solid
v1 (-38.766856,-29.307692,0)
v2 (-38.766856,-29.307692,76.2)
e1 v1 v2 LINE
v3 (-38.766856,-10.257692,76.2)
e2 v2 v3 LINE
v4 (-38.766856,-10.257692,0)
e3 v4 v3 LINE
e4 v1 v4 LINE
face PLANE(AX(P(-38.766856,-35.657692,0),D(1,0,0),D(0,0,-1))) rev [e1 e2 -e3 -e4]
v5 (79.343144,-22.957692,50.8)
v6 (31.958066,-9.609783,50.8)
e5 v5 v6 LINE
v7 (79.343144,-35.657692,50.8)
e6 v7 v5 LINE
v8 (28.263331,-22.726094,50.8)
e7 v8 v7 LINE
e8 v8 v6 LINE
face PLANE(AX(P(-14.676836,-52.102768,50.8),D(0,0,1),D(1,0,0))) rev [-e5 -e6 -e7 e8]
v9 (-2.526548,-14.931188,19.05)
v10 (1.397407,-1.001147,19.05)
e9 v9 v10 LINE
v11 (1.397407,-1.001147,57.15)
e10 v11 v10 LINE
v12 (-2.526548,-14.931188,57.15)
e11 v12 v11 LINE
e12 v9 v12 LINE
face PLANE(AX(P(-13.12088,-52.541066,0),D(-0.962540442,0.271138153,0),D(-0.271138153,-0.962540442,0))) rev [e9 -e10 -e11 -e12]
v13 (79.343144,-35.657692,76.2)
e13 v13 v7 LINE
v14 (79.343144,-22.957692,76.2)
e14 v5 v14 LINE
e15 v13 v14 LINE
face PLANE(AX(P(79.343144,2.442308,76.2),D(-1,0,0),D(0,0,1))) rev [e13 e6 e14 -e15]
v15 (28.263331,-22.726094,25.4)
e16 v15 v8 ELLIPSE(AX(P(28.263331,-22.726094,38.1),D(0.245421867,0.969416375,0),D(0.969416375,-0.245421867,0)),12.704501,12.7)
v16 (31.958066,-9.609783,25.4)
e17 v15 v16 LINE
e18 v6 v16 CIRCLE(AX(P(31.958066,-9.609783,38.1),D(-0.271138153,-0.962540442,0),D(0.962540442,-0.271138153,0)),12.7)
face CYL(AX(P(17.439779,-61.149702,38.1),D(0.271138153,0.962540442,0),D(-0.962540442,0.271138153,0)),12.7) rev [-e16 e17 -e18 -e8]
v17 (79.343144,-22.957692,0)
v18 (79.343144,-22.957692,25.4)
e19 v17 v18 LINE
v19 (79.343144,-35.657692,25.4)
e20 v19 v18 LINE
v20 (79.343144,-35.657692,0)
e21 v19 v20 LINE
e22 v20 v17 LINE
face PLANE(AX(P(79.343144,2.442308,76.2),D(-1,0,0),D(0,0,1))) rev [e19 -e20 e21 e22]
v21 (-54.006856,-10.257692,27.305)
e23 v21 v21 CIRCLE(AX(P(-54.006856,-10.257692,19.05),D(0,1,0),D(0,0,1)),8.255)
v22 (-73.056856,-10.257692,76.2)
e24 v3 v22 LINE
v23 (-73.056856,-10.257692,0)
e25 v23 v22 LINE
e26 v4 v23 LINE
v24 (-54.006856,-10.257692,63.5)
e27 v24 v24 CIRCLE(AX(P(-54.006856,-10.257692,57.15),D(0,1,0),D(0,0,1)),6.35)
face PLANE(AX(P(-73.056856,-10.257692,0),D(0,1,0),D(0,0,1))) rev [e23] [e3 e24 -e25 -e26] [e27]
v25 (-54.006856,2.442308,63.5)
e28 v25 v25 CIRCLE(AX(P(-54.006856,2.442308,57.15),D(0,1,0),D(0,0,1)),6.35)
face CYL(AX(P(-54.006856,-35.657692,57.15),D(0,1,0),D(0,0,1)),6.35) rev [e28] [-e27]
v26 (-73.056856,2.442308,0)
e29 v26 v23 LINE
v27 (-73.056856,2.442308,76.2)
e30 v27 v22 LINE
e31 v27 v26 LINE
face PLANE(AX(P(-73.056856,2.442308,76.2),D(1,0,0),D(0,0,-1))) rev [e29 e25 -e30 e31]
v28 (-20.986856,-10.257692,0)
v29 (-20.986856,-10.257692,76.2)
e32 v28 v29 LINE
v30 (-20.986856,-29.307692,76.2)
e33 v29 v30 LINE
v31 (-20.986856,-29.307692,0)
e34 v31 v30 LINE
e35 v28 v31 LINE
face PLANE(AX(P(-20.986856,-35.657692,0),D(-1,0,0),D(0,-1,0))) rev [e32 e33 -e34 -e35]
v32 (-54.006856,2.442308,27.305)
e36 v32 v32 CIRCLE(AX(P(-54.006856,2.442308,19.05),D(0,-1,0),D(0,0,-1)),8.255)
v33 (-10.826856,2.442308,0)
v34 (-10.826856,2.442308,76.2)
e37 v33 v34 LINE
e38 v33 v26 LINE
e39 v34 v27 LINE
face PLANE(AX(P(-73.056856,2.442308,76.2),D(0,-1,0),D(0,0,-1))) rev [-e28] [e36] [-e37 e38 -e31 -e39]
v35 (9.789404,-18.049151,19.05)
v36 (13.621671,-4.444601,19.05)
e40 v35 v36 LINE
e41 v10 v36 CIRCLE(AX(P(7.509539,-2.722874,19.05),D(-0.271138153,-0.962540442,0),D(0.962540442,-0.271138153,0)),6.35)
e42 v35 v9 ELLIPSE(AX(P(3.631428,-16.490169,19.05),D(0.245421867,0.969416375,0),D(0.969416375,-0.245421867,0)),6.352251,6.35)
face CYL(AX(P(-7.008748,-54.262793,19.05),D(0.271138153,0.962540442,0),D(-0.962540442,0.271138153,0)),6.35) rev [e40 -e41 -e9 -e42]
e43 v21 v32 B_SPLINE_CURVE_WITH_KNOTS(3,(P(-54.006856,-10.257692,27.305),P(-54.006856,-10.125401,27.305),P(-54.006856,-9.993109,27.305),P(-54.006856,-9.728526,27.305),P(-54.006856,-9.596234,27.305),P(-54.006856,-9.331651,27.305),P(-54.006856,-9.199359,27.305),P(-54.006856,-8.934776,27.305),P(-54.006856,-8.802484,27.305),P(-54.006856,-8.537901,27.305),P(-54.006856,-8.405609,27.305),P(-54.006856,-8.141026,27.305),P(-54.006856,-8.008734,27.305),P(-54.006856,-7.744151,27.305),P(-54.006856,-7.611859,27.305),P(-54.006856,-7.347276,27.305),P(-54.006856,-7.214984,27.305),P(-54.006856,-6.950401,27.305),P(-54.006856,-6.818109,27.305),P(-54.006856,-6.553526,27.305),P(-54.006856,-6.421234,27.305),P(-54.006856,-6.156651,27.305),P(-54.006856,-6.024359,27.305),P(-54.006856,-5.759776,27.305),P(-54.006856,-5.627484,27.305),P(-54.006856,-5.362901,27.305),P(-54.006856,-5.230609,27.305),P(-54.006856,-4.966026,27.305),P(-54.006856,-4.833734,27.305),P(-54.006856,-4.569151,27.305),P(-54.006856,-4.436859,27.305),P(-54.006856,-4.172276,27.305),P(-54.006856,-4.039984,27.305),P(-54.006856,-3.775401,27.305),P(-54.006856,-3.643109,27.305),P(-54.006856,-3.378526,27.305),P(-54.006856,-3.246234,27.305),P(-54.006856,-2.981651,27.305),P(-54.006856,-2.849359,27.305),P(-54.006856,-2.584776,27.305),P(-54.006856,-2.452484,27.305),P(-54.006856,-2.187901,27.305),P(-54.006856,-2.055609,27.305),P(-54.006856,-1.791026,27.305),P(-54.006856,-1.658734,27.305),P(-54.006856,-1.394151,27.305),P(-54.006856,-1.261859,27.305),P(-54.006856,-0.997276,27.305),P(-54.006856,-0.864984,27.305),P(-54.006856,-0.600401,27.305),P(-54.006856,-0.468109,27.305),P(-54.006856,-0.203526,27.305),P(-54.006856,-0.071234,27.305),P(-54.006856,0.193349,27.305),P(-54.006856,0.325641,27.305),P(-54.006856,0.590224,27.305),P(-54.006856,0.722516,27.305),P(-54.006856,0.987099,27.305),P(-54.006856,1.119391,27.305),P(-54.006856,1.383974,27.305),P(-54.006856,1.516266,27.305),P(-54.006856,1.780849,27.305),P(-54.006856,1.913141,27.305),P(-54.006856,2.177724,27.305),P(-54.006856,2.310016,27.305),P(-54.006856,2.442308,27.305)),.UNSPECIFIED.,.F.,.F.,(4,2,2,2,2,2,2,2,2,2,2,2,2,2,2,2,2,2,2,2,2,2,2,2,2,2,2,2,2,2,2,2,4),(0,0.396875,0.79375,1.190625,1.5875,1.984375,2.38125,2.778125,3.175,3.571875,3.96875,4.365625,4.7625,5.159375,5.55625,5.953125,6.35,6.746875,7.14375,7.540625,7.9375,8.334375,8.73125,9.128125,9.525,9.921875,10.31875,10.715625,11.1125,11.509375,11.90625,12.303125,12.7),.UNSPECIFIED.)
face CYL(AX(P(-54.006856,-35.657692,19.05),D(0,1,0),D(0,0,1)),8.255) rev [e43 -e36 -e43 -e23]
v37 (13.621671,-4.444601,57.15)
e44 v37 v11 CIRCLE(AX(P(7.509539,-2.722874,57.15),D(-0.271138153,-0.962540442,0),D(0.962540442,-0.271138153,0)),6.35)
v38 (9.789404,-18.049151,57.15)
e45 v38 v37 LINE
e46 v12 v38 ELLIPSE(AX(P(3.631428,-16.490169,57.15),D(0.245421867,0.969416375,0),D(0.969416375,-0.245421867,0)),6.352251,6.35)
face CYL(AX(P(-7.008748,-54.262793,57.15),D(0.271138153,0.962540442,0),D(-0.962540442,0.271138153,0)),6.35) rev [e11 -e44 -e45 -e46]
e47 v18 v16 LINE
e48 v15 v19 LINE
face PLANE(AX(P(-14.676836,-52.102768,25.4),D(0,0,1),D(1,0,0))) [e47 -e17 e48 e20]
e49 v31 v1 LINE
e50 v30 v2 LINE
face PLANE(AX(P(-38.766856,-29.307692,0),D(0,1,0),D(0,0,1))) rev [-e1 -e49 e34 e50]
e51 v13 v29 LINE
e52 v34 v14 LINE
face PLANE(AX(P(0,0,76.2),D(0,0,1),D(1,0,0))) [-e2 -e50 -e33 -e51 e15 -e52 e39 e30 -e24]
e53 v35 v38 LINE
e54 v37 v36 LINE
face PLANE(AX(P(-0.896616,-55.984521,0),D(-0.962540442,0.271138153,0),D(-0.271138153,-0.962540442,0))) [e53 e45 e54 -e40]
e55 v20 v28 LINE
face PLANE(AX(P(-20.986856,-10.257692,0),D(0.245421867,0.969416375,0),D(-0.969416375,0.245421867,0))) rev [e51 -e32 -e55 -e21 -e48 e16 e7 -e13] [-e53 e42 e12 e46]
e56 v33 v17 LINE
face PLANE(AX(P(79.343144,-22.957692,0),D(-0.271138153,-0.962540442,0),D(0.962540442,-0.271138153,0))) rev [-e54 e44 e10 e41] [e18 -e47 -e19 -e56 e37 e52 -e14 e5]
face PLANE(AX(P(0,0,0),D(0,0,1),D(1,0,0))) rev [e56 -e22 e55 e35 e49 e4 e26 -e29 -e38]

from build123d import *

# Parameters (mm, degrees)
BOSS_EXTRUDE1_START     = -73.056856187
BOSS_EXTRUDE1_OUTLINE_W = 38.1
BOSS_EXTRUDE1_OUTLINE_H = 76.2
BOSS_EXTRUDE1_DEPTH     = 152.4
SKETCH3_W               = 34.29
SKETCH3_H               = 25.4
CUT_EXTRUDE1_DEPTH      = 116.642749409
SKETCH4_W               = 17.78
SKETCH4_H               = 6.35
CUT_EXTRUDE2_DEPTH      = 116.642749409
CUT_EXTRUDE3_DEPTH      = 116.642749409
CUT_EXTRUDE4_DEPTH      = 116.642749409
CUT_EXTRUDE5_DEPTH      = 116.642749409
CUT_EXTRUDE5_DEPTH_BACK = 116.642749409
SKETCH8_R               = 6.35
CUT_EXTRUDE6_DEPTH      = 117.419003905
CUT_EXTRUDE6_DEPTH_BACK = 117.419003905
SKETCH11_R              = 8.255
CUT_EXTRUDE7_DEPTH      = 116.579441005
CUT_EXTRUDE7_DEPTH_BACK = 116.579441005
CUT_EXTRUDE9_DEPTH      = 116.579441005
CUT_EXTRUDE9_DEPTH_BACK = 116.579441005
SKETCH14_W              = 3.443454538
SKETCH14_H              = 25.4


# Read off the part's stored shape, not the designer's step: Boss-Extrude1
with BuildPart() as part:
    # Boss-Extrude1 outline → Boss-Extrude1 (new body)
    with BuildSketch(Plane.YZ.offset(BOSS_EXTRUDE1_START)):
        with Locations((-16.607692308, 38.1)):
            Rectangle(BOSS_EXTRUDE1_OUTLINE_W, BOSS_EXTRUDE1_OUTLINE_H)
    extrude(amount=BOSS_EXTRUDE1_DEPTH)

    # Sketch3 → Cut-Extrude1 (cut, through all)
    with BuildSketch(Plane.XY.offset(76.2)):
        with Locations((-55.911856187, -22.957692308)):
            Rectangle(SKETCH3_W, SKETCH3_H)
    extrude(amount=-CUT_EXTRUDE1_DEPTH, mode=Mode.SUBTRACT)

    # Sketch4 → Cut-Extrude2 (cut, through all)
    with BuildSketch(Plane.XY.offset(76.2)):
        with Locations((-29.876856187, -32.482692308)):
            Rectangle(SKETCH4_W, SKETCH4_H)
    extrude(amount=-CUT_EXTRUDE2_DEPTH, mode=Mode.SUBTRACT)

    # Sketch5 → Cut-Extrude3 (cut, through all)
    with BuildSketch(Plane.XY.offset(76.2)):
        Polygon((-20.986856187, -35.657692308), (-20.986856187, -10.257692308), (79.343143813, -35.657692308), align=None)
    extrude(amount=-CUT_EXTRUDE3_DEPTH, mode=Mode.SUBTRACT)

    # Sketch6 → Cut-Extrude4 (cut, through all)
    with BuildSketch(Plane.XY.offset(76.2)):
        Polygon((79.343143813, 2.442307692), (79.343143813, -22.957692308), (-10.826856187, 2.442307692), align=None)
    extrude(amount=-CUT_EXTRUDE4_DEPTH, mode=Mode.SUBTRACT)

    # Sketch8 → Cut-Extrude5 (cut, two sides: drawn at the far end of the back side and taken through both)
    with BuildSketch(Plane(origin=(0, 0, 0), x_dir=(1, 0, 0), z_dir=(0, 1, 0)).offset(-CUT_EXTRUDE5_DEPTH_BACK)):
        with Locations(Location((-54.006856187, -57.15, 0), (0, 0, 270))):
            Circle(SKETCH8_R)
    extrude(amount=CUT_EXTRUDE5_DEPTH + CUT_EXTRUDE5_DEPTH_BACK, mode=Mode.SUBTRACT)

    # Sketch11 → Cut-Extrude6 (cut, two sides: drawn at the far end of the back side and taken through both)
    with BuildSketch(Plane(origin=(0, 2.442307692, 0), x_dir=(1, 0, 0), z_dir=(0, 1, 0)).offset(-CUT_EXTRUDE6_DEPTH_BACK)):
        with Locations(Location((-54.006856187, -19.05, 0), (0, 0, 270))):
            Circle(SKETCH11_R)
    extrude(amount=CUT_EXTRUDE6_DEPTH + CUT_EXTRUDE6_DEPTH_BACK, mode=Mode.SUBTRACT)

    # Sketch12 → Cut-Extrude7 (cut, two sides: drawn at the far end of the back side and taken through both)
    with BuildSketch(Plane(origin=(-0.158549081, -0.562849239, 0), x_dir=(0.9625404418449637, -0.2711381526323841, 0), z_dir=(0.27113815263238417, 0.9625404418449638, 0)).offset(-CUT_EXTRUDE7_DEPTH_BACK)):
        with BuildLine():
            ThreePointArc((14.316510266, -19.05), (7.966510266, -25.4), (1.616510266, -19.05))
            Line((1.616510266, -19.05), (1.616510266, -57.15))
            ThreePointArc((1.616510266, -57.15), (7.966510266, -50.8), (14.316510266, -57.15))
            Line((14.316510266, -57.15), (14.316510266, -19.05))
        make_face()
        with BuildLine():
            ThreePointArc((14.316510266, -19.05), (7.966510266, -12.7), (1.616510266, -19.05))
            Line((1.616510266, -19.05), (14.316510266, -19.05))
        make_face()
        with BuildLine():
            Line((14.316510266, -19.05), (1.616510266, -19.05))
            ThreePointArc((1.616510266, -19.05), (7.966510266, -25.4), (14.316510266, -19.05))
        make_face()
        with BuildLine():
            ThreePointArc((14.316510266, -57.15), (7.966510266, -50.8), (1.616510266, -57.15))
            Line((1.616510266, -57.15), (14.316510266, -57.15))
        make_face()
        with BuildLine():
            Line((14.316510266, -57.15), (1.616510266, -57.15))
            ThreePointArc((1.616510266, -57.15), (7.966510266, -63.5), (14.316510266, -57.15))
        make_face()
    extrude(amount=CUT_EXTRUDE7_DEPTH + CUT_EXTRUDE7_DEPTH_BACK, mode=Mode.SUBTRACT)

    # Sketch14 → Cut-Extrude9 (cut, two sides: drawn at the far end of the back side and taken through both)
    with BuildSketch(Plane(origin=(-0.158549081, -0.562849239, 0), x_dir=(0.9625404418449637, -0.2711381526323841, 0), z_dir=(0.27113815263238417, 0.9625404418449638, 0)).offset(-CUT_EXTRUDE9_DEPTH_BACK)):
        with Locations((84.317418253, -38.1)):
            Rectangle(SKETCH14_W, SKETCH14_H)
        with BuildLine():
            Line((82.595690984, -25.4), (33.366510266, -25.4))
            ThreePointArc((33.366510266, -25.4), (42.346766387, -29.119743879), (46.066510266, -38.1))
            ThreePointArc((46.066510266, -38.1), (42.346766387, -47.080256121), (33.366510266, -50.8))
            Line((33.366510266, -50.8), (82.595690984, -50.8))
            Line((82.595690984, -50.8), (82.595690984, -25.4))
        make_face()
        with BuildLine():
            ThreePointArc((46.066510266, -38.1), (42.346766387, -29.119743879), (33.366510266, -25.4))
            Line((33.366510266, -25.4), (33.366510266, -50.8))
            ThreePointArc((33.366510266, -50.8), (42.346766387, -47.080256121), (46.066510266, -38.1))
        make_face()
        with BuildLine():
            Line((33.366510266, -50.8), (33.366510266, -25.4))
            ThreePointArc((33.366510266, -25.4), (20.666510266, -38.1), (33.366510266, -50.8))
        make_face()
    extrude(amount=CUT_EXTRUDE9_DEPTH + CUT_EXTRUDE9_DEPTH_BACK, mode=Mode.SUBTRACT)


solid = part.part
